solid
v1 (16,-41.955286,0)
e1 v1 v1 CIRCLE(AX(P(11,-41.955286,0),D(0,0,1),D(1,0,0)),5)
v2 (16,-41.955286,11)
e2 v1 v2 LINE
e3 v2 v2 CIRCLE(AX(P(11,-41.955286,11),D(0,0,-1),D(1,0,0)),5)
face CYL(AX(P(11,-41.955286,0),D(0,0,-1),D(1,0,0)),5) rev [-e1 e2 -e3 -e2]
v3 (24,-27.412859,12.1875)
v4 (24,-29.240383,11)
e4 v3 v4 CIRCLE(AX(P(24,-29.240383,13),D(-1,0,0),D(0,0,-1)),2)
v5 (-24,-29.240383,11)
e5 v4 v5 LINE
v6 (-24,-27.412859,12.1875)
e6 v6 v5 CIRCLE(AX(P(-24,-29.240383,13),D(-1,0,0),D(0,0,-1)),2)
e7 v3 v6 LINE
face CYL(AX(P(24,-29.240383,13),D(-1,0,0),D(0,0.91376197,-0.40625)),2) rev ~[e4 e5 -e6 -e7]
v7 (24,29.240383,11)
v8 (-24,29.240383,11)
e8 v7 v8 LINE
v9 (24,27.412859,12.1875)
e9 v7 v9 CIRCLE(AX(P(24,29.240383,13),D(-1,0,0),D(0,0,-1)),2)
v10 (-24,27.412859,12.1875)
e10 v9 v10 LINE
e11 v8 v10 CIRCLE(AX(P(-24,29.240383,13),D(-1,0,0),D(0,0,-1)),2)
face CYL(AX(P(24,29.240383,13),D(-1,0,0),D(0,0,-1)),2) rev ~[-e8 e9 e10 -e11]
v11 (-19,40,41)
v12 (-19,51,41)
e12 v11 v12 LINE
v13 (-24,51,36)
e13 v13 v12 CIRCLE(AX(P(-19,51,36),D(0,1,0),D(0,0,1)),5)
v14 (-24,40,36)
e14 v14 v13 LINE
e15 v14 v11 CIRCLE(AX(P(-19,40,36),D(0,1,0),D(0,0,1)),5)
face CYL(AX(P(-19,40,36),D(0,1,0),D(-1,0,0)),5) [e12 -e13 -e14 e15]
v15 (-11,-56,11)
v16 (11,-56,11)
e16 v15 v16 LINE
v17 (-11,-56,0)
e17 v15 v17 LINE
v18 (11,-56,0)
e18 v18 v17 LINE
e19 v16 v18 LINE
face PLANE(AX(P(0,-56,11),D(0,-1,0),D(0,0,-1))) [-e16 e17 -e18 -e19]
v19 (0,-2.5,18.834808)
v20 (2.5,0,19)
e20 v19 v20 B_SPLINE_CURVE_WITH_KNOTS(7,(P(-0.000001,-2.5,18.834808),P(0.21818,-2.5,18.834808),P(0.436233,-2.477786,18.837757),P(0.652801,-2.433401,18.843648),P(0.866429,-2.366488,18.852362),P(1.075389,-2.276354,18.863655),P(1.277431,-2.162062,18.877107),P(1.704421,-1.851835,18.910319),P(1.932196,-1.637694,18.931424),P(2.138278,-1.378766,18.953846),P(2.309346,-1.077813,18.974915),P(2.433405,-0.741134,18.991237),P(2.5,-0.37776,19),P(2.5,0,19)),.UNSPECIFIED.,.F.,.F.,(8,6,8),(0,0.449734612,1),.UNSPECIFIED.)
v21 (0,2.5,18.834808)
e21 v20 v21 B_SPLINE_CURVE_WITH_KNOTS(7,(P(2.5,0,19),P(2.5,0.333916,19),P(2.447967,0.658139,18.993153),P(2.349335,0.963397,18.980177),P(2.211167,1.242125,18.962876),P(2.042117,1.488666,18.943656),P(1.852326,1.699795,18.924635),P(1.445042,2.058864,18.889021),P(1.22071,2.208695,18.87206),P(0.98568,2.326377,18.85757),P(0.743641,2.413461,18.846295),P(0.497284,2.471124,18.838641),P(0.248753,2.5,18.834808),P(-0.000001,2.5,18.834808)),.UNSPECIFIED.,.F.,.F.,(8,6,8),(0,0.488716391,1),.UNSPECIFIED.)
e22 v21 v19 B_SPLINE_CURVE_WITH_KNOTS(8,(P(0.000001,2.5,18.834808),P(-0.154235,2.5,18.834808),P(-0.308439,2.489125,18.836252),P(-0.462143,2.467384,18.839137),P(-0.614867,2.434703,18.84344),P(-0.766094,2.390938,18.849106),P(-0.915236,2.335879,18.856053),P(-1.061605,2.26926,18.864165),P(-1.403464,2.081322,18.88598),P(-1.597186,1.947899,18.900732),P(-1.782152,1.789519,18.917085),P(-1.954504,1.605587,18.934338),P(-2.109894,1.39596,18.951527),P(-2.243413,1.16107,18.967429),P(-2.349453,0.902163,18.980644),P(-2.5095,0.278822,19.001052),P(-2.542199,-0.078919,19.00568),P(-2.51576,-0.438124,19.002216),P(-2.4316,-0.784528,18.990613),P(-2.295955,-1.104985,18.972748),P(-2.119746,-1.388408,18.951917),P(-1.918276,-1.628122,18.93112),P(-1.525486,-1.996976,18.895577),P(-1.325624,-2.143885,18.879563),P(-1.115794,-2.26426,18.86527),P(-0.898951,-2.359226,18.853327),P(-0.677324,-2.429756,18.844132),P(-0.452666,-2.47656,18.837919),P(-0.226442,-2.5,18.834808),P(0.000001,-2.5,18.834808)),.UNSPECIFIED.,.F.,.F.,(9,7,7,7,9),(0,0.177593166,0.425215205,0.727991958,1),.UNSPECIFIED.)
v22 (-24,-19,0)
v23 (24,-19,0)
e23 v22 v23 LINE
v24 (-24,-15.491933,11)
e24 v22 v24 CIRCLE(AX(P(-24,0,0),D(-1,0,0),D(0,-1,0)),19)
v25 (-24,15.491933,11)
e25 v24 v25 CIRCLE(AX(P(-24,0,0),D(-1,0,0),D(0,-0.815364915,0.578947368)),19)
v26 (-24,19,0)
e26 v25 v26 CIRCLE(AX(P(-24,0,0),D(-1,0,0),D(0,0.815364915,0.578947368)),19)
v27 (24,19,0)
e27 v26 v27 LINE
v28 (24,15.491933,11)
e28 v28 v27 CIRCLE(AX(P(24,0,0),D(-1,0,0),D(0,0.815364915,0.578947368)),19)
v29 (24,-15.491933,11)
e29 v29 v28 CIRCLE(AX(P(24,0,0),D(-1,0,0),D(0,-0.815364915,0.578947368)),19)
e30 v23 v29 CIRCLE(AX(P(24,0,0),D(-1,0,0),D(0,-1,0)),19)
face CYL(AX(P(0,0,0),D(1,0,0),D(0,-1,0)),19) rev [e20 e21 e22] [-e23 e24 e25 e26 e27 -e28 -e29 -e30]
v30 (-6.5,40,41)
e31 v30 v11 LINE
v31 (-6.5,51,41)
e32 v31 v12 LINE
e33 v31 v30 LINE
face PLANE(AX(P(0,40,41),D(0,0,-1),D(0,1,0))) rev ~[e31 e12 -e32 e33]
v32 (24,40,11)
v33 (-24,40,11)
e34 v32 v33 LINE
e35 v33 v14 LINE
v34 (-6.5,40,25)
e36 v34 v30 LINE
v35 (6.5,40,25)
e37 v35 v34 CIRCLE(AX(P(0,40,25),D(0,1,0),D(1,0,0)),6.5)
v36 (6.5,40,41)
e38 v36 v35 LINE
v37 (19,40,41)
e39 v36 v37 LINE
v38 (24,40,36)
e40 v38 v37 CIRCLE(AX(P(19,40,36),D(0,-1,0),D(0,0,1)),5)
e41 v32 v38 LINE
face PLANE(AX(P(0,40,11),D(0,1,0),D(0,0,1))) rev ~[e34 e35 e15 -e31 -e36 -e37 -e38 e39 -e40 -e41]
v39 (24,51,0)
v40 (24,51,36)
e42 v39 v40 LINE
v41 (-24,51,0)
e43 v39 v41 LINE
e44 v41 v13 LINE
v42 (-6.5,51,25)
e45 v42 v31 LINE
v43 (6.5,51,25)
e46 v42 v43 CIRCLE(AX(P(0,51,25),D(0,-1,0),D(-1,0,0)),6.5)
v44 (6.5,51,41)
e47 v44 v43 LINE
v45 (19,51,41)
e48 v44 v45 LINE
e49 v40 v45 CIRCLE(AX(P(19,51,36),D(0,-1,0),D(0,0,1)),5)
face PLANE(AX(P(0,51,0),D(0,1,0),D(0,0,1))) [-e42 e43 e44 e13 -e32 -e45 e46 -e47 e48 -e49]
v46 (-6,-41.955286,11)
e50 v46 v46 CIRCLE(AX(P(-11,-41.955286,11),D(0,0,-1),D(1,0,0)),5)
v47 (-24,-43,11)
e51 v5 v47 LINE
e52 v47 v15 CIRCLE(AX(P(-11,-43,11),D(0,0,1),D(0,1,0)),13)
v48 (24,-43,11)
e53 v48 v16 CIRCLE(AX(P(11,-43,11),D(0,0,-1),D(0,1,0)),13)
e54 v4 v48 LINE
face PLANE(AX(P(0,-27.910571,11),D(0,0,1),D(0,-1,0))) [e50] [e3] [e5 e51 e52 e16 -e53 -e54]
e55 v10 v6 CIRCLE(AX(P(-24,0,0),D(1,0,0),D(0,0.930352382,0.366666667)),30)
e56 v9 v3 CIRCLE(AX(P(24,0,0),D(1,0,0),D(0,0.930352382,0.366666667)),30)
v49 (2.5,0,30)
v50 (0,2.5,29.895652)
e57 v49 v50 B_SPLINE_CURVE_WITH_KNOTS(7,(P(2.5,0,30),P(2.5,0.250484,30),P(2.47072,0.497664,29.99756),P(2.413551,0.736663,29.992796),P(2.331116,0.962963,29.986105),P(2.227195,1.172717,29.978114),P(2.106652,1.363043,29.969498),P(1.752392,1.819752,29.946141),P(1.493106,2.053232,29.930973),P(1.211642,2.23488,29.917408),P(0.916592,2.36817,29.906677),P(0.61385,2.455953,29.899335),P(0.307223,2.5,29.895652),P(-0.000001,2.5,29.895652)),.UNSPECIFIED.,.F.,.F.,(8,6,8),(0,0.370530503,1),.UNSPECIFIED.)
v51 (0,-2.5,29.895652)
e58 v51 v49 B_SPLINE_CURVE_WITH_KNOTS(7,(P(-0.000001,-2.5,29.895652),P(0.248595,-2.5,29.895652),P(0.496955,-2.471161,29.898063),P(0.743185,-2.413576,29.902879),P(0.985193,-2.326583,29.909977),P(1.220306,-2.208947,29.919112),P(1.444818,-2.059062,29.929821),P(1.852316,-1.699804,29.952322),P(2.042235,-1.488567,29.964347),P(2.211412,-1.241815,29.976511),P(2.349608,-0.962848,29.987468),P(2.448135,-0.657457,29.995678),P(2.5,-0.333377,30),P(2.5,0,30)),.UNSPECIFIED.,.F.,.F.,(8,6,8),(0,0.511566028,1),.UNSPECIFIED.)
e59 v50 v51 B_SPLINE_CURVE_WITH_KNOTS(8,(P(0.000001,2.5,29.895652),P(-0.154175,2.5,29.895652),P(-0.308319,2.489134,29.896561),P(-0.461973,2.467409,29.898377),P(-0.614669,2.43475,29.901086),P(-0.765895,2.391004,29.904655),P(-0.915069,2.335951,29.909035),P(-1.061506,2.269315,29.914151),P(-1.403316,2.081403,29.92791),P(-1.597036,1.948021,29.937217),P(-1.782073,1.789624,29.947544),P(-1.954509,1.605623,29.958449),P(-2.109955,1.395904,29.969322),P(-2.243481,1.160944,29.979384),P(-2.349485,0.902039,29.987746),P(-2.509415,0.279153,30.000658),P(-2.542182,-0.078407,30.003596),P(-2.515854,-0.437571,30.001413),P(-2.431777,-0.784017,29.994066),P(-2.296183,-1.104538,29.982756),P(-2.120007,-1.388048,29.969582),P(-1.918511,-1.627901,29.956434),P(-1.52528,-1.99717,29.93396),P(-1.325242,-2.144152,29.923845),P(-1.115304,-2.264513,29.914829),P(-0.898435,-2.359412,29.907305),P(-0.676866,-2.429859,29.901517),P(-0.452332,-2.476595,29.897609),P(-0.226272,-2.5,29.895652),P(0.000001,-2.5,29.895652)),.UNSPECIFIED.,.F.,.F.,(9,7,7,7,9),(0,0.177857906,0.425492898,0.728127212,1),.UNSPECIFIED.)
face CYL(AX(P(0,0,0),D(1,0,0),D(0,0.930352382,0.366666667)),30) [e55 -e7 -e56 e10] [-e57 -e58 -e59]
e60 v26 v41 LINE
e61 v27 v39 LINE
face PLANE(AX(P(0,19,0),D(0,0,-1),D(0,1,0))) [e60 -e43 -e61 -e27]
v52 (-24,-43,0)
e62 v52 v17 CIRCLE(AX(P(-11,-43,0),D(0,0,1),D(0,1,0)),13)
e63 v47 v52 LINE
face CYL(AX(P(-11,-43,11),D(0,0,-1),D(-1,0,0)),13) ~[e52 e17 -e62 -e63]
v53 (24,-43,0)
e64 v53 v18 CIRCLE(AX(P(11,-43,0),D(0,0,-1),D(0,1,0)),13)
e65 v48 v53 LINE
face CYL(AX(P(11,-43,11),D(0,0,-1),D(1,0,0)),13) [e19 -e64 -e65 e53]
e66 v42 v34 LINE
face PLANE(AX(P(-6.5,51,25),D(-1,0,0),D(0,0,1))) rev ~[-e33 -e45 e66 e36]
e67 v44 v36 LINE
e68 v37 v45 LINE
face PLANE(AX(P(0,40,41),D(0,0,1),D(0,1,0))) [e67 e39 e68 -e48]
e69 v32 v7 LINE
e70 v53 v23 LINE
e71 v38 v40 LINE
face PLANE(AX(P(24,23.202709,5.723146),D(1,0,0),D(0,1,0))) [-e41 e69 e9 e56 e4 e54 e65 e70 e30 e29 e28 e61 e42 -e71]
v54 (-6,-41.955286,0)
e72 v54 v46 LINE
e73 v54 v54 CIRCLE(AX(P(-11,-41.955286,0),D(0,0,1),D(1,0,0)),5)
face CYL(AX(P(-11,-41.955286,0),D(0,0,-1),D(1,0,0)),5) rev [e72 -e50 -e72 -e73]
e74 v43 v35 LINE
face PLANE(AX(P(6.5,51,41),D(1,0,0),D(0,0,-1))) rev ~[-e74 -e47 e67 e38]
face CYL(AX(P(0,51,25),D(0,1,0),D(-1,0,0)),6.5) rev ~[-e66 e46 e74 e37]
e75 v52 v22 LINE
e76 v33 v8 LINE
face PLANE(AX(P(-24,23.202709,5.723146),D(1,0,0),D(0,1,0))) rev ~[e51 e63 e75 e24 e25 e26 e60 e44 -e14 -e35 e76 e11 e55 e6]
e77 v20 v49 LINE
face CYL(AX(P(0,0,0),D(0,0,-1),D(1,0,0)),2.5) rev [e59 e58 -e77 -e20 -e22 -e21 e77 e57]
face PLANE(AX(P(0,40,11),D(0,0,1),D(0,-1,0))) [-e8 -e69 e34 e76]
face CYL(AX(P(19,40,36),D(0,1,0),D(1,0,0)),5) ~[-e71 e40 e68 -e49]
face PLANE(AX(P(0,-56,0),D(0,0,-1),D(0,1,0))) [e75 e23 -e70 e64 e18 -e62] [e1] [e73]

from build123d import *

# Parameters (mm, degrees)
F0_W     = 11
F0_H     = 30
F1_DEPTH = 24
F3_DEPTH = 11
F4_R     = 2.5
F4_R_2   = 5
F5_DEPTH = 41.001
F6_R     = 13
F7_R     = 5
F8_R     = 2


# Not quite as in the source:
# - a feature names something its author has since deleted; it is built from what else it names


with BuildPart() as f1:
    # F0 (on Right) → F1 (new body, symmetric)
    with BuildSketch(Plane.YZ):
        with BuildLine():
            ThreePointArc((15.4919333848, 11), (18.1017503893, 5.7729223833), (19, 0))
            Line((19, 0), (30, 0))
            ThreePointArc((30, 0), (29.4730143031, 5.5983415304), (27.9105714739, 11))
            Line((27.9105714739, 11), (15.4919333848, 11))
        make_face()
        with BuildLine():
            ThreePointArc((-15.4919333848, 11), (0, 19), (15.4919333848, 11))
            Line((15.4919333848, 11), (27.9105714739, 11))
            ThreePointArc((27.9105714739, 11), (0, 30), (-27.9105714739, 11))
            Line((-27.9105714739, 11), (-15.4919333848, 11))
        make_face()
        with BuildLine():
            Line((-30, 0), (-19, 0))
            ThreePointArc((-19, 0), (-18.1017503893, 5.7729223833), (-15.4919333848, 11))
            Line((-15.4919333848, 11), (-27.9105714739, 11))
            ThreePointArc((-27.9105714739, 11), (-29.4730143031, 5.5983415304), (-30, 0))
        make_face()
        with BuildLine():
            ThreePointArc((27.9105714739, 11), (29.4730143031, 5.5983415304), (30, 0))
            Line((30, 0), (51, 0))
            Line((51, 0), (51, 11))
            Line((51, 11), (40, 11))
            Line((40, 11), (27.9105714739, 11))
        make_face()
        with BuildLine():
            Line((-56, 0), (-30, 0))
            ThreePointArc((-30, 0), (-29.4730143031, 5.5983415304), (-27.9105714739, 11))
            Line((-27.9105714739, 11), (-56, 11))
            Line((-56, 11), (-56, 0))
        make_face()
        with Locations((45.5, 26)):
            Rectangle(F0_W, F0_H)
    extrude(amount=F1_DEPTH, both=True)

    # F2 (on face) → F3 (cut, through all)
    with BuildSketch(Plane(origin=(0, 51, 0), x_dir=(-1, 0, 0), z_dir=(0, 1, 0))):
        with BuildLine():
            ThreePointArc((-6.5, 25), (0, 18.5), (6.5, 25))
            ThreePointArc((6.5, 25), (0, 31.5), (-6.5, 25))
        make_face()
        with BuildLine():
            ThreePointArc((-6.5, 25), (0, 31.5), (6.5, 25))
            Line((6.5, 25), (6.5, 41))
            Line((6.5, 41), (-6.5, 41))
            Line((-6.5, 41), (-6.5, 25))
        make_face()
    extrude(amount=-F3_DEPTH, mode=Mode.SUBTRACT)

    # F4 (on Top) → F5 (cut, through all)
    with BuildSketch(Plane.XY):
        Circle(F4_R)
        with Locations((-11, -41.955285737)):
            Circle(F4_R_2)
        with Locations((11, -41.955285737)):
            Circle(F4_R_2)
    extrude(amount=F5_DEPTH, mode=Mode.SUBTRACT)

    # F6
    f6_edges = [f1.edges().sort_by_distance(p)[0] for p in [
        (24, -56, 5.5),
        (-24, -56, 5.5),
    ]]
    fillet(f6_edges, radius=F6_R)

    # F7
    f7_edges = [f1.edges().sort_by_distance(p)[0] for p in [
        (24, 45.5, 41),
        (-24, 45.5, 41),
    ]]
    fillet(f7_edges, radius=F7_R)

    # F8
    f8_edges = [f1.edges().sort_by_distance(p)[0] for p in [
        (0, -27.910571, 11),
        (0, 27.910571, 11),
    ]]
    fillet(f8_edges, radius=F8_R)


solid = f1.part
